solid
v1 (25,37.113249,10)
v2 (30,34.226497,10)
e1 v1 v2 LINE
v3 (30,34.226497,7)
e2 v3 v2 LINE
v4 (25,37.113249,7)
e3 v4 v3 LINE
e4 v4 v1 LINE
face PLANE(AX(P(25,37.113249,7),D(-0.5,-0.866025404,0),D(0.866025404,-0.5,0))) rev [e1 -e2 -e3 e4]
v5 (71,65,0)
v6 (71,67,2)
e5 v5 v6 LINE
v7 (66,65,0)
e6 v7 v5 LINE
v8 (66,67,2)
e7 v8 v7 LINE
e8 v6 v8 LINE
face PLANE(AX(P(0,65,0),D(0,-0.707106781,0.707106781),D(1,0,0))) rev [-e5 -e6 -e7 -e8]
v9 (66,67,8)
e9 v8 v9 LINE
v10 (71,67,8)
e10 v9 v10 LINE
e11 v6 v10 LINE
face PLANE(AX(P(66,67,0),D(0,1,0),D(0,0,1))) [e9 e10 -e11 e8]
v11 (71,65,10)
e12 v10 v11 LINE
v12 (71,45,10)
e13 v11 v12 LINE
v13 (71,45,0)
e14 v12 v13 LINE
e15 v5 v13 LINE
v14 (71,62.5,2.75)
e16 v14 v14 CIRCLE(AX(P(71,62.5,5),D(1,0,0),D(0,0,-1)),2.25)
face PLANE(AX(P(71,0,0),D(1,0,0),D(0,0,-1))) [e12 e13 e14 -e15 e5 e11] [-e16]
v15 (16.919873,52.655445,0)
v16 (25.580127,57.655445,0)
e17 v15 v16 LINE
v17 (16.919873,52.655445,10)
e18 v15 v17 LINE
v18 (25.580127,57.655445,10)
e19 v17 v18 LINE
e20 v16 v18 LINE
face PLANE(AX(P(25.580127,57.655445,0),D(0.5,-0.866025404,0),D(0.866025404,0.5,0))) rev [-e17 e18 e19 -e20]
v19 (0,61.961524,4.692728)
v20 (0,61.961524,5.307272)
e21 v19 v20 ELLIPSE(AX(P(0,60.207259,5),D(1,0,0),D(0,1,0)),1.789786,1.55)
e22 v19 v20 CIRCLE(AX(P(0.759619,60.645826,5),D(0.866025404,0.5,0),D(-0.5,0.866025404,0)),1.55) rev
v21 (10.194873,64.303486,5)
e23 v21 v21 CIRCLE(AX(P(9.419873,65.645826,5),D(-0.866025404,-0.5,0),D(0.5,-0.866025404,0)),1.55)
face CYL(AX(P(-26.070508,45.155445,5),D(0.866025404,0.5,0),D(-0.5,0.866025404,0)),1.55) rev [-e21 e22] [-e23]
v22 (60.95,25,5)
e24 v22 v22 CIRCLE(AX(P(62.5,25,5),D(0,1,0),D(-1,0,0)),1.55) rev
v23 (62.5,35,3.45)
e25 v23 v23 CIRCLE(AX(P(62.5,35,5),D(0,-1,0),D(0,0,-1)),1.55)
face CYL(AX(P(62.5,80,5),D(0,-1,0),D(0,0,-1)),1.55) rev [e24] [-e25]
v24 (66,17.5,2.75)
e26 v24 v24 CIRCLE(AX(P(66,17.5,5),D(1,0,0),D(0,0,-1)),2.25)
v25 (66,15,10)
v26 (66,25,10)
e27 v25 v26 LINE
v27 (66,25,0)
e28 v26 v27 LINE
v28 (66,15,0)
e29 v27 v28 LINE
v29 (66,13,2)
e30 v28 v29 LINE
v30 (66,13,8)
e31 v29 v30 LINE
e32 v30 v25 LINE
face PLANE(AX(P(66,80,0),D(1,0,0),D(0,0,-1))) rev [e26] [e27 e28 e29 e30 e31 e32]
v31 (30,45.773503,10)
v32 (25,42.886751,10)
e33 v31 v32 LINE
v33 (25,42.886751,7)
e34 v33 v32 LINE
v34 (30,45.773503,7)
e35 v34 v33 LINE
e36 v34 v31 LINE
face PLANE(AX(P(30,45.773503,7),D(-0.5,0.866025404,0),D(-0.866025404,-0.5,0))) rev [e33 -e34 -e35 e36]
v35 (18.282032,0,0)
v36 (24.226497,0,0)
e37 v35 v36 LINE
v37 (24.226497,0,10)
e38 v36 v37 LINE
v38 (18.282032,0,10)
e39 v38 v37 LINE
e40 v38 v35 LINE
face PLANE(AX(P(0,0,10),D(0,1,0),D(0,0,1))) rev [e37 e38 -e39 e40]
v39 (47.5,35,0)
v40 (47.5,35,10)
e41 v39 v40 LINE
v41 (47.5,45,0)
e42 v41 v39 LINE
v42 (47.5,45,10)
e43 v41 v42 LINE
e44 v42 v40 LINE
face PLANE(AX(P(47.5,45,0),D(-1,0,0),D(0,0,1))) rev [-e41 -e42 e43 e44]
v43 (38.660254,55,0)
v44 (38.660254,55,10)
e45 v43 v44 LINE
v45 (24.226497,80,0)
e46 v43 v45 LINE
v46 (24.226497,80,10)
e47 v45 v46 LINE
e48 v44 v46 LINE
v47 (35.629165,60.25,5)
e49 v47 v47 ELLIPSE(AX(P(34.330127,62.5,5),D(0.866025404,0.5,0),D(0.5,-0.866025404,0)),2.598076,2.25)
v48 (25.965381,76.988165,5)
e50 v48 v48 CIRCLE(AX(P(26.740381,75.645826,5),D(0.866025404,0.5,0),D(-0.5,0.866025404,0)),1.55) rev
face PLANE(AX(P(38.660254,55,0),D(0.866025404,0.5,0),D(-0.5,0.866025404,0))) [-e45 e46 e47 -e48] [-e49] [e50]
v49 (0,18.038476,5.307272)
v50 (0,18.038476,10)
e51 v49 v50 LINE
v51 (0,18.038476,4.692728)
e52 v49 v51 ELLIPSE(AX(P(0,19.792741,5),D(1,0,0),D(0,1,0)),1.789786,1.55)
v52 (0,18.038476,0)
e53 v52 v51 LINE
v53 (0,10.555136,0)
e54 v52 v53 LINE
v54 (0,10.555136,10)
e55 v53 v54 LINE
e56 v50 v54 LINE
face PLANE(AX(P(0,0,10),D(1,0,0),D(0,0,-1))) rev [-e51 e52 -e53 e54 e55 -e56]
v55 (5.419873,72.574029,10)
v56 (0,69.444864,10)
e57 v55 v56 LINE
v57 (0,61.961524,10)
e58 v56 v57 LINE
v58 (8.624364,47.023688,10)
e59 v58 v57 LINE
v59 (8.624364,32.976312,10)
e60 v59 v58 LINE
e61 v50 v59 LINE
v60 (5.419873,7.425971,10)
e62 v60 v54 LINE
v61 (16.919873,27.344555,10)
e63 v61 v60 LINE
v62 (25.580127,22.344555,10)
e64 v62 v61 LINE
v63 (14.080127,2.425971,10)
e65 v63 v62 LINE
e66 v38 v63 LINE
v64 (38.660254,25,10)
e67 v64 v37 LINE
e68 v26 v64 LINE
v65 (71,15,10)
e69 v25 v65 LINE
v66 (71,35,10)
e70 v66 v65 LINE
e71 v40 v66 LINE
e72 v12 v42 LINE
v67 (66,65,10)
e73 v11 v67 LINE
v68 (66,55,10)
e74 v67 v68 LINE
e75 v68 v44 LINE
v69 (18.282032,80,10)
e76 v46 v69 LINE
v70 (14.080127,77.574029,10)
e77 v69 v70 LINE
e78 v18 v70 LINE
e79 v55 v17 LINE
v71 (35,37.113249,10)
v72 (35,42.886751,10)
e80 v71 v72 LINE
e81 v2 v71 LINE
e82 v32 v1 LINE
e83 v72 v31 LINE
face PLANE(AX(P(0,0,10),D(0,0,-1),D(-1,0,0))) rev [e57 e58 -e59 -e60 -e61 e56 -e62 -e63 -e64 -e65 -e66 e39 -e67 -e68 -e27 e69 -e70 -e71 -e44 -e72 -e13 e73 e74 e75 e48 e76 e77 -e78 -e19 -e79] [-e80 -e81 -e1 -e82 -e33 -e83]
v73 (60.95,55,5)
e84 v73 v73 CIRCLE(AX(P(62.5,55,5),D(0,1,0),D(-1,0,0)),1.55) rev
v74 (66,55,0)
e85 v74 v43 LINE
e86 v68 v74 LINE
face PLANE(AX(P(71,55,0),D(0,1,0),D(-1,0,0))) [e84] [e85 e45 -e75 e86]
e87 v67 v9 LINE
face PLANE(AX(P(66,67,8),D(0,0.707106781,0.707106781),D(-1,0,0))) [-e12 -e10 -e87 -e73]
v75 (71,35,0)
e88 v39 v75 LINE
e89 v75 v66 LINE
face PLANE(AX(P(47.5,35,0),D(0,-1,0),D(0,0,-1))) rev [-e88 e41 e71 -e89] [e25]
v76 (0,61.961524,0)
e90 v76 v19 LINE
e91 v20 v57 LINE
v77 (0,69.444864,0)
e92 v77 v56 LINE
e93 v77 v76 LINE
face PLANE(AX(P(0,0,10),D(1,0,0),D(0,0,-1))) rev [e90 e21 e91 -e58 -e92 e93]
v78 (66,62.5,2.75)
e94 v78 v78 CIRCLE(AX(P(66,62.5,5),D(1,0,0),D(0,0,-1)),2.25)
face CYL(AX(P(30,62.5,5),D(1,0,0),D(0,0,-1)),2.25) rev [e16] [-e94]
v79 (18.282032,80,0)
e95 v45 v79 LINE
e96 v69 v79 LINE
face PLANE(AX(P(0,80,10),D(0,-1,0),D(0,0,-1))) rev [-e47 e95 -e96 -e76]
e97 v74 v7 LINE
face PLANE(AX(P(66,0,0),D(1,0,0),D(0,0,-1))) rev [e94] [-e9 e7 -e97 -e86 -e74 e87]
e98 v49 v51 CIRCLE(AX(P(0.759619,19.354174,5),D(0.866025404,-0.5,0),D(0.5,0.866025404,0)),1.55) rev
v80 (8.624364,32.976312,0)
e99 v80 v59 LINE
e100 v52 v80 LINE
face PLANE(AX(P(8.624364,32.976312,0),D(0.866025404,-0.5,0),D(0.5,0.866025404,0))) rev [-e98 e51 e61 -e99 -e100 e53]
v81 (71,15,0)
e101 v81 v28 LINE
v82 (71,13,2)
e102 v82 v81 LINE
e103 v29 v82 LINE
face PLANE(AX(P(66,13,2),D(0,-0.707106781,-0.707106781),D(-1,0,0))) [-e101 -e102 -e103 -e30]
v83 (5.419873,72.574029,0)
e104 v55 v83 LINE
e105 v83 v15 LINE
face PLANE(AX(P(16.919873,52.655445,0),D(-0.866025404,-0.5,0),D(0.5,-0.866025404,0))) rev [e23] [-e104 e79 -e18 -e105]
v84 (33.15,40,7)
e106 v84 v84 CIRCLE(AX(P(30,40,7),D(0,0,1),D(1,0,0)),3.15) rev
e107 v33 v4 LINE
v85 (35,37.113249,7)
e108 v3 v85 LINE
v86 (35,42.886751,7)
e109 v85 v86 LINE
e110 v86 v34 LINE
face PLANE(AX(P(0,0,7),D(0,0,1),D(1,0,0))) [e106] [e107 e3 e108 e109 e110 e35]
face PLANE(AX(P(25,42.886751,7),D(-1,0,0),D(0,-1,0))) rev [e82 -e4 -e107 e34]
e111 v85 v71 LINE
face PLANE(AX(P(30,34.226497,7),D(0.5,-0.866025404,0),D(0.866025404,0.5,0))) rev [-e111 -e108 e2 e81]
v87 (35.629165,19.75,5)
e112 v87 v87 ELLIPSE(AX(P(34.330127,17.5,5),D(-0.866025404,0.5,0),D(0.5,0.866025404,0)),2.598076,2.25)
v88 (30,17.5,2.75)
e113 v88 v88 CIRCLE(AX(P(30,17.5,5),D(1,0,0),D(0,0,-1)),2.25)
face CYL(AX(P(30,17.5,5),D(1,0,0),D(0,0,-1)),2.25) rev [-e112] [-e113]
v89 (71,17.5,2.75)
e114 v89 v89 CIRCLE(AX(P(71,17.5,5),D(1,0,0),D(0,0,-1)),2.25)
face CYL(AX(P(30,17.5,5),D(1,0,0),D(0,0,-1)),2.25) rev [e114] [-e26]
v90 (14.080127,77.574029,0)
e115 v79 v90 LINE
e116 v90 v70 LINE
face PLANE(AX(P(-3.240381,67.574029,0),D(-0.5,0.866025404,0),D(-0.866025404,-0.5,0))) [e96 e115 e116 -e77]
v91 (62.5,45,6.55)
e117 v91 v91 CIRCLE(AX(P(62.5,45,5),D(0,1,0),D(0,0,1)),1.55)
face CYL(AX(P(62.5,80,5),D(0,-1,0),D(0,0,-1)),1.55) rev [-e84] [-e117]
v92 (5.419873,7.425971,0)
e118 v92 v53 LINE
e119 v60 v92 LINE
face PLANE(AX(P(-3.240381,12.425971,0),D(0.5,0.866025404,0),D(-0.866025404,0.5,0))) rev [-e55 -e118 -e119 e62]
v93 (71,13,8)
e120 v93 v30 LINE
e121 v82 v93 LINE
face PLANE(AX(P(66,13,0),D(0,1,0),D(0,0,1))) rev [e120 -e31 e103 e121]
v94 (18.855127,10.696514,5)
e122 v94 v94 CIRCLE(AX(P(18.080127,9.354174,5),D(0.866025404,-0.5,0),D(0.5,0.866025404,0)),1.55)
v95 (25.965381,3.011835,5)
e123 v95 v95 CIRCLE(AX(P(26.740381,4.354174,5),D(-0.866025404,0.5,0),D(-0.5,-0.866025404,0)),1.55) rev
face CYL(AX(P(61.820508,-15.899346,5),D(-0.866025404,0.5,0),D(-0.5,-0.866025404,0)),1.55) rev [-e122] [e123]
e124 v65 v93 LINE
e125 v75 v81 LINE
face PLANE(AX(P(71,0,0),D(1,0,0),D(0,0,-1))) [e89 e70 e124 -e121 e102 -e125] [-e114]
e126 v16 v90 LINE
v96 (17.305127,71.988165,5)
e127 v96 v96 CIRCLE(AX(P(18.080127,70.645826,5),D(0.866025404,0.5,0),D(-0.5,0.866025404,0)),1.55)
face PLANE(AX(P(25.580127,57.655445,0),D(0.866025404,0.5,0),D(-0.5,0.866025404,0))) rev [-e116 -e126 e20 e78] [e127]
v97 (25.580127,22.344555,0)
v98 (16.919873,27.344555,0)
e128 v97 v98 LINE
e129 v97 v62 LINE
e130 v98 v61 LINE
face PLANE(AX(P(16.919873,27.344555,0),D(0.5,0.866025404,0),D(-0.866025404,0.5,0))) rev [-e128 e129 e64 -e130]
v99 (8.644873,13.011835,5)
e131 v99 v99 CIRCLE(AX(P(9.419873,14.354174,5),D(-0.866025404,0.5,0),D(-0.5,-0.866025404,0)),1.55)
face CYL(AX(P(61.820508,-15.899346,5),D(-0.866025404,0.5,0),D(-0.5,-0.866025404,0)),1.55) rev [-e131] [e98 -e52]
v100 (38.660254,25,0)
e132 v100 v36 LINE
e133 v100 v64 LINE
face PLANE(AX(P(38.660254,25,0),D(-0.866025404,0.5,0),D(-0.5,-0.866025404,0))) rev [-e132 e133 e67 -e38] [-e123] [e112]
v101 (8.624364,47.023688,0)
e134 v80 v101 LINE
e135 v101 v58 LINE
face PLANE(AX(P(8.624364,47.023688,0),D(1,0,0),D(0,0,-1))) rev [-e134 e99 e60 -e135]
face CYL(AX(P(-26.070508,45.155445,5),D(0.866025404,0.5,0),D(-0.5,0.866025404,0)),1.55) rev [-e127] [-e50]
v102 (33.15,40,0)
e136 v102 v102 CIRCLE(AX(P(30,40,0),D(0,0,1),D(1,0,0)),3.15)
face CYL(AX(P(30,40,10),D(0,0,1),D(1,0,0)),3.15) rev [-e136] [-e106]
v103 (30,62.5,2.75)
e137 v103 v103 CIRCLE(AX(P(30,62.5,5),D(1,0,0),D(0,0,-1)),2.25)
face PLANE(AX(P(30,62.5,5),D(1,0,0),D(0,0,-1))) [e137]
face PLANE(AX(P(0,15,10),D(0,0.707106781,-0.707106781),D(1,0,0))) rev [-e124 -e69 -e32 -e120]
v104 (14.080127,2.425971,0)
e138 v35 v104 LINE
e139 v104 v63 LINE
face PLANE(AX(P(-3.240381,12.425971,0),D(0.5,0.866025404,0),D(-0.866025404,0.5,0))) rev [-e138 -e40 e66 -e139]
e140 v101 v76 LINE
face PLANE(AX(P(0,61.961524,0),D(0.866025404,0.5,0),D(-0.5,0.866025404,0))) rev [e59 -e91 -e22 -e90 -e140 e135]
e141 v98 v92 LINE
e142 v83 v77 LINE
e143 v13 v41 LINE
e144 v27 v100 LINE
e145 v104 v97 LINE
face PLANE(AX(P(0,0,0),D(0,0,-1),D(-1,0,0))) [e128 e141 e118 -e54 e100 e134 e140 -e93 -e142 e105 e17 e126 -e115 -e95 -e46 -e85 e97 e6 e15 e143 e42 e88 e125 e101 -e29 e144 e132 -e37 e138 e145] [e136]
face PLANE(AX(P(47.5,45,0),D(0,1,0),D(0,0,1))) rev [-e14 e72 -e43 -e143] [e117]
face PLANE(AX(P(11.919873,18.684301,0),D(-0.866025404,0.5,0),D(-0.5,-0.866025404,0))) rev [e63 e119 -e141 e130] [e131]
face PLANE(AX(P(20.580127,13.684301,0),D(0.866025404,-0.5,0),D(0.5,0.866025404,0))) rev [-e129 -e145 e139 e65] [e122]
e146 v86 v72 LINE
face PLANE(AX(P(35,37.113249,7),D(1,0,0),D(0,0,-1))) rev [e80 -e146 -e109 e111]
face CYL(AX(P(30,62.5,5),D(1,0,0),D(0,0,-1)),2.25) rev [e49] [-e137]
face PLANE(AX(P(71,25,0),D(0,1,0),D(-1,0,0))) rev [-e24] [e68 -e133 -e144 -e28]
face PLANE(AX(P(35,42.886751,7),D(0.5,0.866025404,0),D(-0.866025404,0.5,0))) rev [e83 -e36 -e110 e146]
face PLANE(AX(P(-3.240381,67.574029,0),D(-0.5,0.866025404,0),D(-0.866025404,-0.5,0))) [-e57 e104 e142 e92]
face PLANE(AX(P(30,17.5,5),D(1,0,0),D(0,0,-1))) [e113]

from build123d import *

# Parameters (mm, degrees)
SKETCH1_W                = 71
SKETCH1_H                = 80
BOSS_EXTRUDE1_DEPTH      = 10
SKETCH3_W                = 10
SKETCH3_H                = 10
CUT_EXTRUDE1_DEPTH       = 10
SKETCH5_W                = 28.158683969
SKETCH5_H                = 10
CUT_EXTRUDE3_DEPTH       = 10
CIRPATTERN1_COUNT        = 3
M6_CLEARANCE_HOLE1_D     = 6.3
CUT_EXTRUDE6_DEPTH       = 3
SKETCH11_R               = 1.55
CUT_EXTRUDE7_DEPTH       = 108.429046352
CIRPATTERN2_COUNT        = 3
CUT_EXTRUDE8_DEPTH       = 10
CUT_EXTRUDE9_DEPTH       = 10
CUT_EXTRUDE10_DEPTH      = 10
SKETCH15_W               = 111
SKETCH15_H               = 42
BOSS_EXTRUDE2_DEPTH      = 10
SKETCH22_W               = 15
SKETCH22_H               = 54
BOSS_EXTRUDE3_DEPTH      = 10
M4_CLEARANCE_HOLE1_D     = 4.5
M4_CLEARANCE_HOLE1_DEPTH = 30
M4_CLEARANCE_HOLE1_TIP   = 1.351936393
SKETCH26_W               = 47.7
SKETCH26_H               = 6
CUT_EXTRUDE13_DEPTH      = 10
CHAMFER1_SIZE            = 4
CHAMFER1_SIZE_2          = 6.92820323
SKETCH27_W               = 6.3
SKETCH27_H               = 6
CUT_EXTRUDE14_DEPTH      = 10
CHAMFER2_SIZE            = 6.92820323
CHAMFER2_SIZE_2          = 4
CUT_EXTRUDE15_DEPTH      = 10
CUT_EXTRUDE16_DEPTH      = 2.2
CUT_EXTRUDE17_DEPTH      = 10
M4_CLEARANCE_HOLE2_D     = 4.5
SKETCH33_W               = 30
SKETCH33_H               = 90
CUT_EXTRUDE18_DEPTH      = 138.189649755
SKETCH34_W               = 10
SKETCH34_H               = 22
BOSS_EXTRUDE4_DEPTH      = 5
SKETCH38_R               = 2.25
CUT_EXTRUDE20_DEPTH      = 41
CHAMFER3_SIZE            = 2


with BuildPart() as part:
    # Sketch1 → Boss-Extrude1 (new body)
    with BuildSketch(Plane.XY):
        with Locations((35.5, 40)):
            Rectangle(SKETCH1_W, SKETCH1_H)
    extrude(amount=BOSS_EXTRUDE1_DEPTH)

    # Sketch3 → Cut-Extrude1 (cut)
    with BuildSketch(Plane.XY.offset(10)):
        Polygon((25.580127019, 57.655444566), (16.919872981, 52.655444566), (11.919872981, 61.315698604), (20.580127019, 66.315698604), align=None)
        Polygon((11.919872981, 18.684301396), (20.580127019, 13.684301396), (25.580127019, 22.344555434), (16.919872981, 27.344555434), align=None)
        with Locations((52.5, 40)):
            Rectangle(SKETCH3_W, SKETCH3_H)
    extrude(amount=-CUT_EXTRUDE1_DEPTH, mode=Mode.SUBTRACT)

    # Sketch5 → Cut-Extrude3 (cut)
    with BuildSketch(Plane.XY.offset(10)):
        with Locations((71.579341985, 40)):
            Rectangle(SKETCH5_W, SKETCH5_H)
    cut_extrude3 = extrude(amount=-CUT_EXTRUDE3_DEPTH, mode=Mode.SUBTRACT)

    # CirPattern1: Cut-Extrude3 ×3 about axis
    cirpattern1_axis = Axis((30, 40, 10), (0, 0, -1))
    for i in range(1, CIRPATTERN1_COUNT):
        add(cut_extrude3.rotate(cirpattern1_axis, i * 360 / CIRPATTERN1_COUNT), mode=Mode.SUBTRACT)

    # M6 Clearance Hole1 (through all)
    with Locations(Plane.XY.offset(10)):
        with Locations((30, 40)):
            Hole(M6_CLEARANCE_HOLE1_D / 2)

    # Sketch10 → Cut-Extrude6 (cut)
    with BuildSketch(Plane.XY.offset(10)):
        Polygon((30, 45.773502692), (25, 42.886751346), (25, 37.113248654), (30, 34.226497308), (35, 37.113248654), (35, 42.886751346), align=None)
    extrude(amount=-CUT_EXTRUDE6_DEPTH, mode=Mode.SUBTRACT)

    # Sketch11 → Cut-Extrude7 (cut, through all)
    with BuildSketch(Plane.XZ):
        with Locations(Location((62.5, 5, 0), (0, 0, 270))):
            Circle(SKETCH11_R)
    cut_extrude7 = extrude(amount=-CUT_EXTRUDE7_DEPTH, mode=Mode.SUBTRACT)

    # CirPattern2: Cut-Extrude7 ×3 about axis
    cirpattern2_axis = Axis((30, 40, 7), (0, 0, 1))
    for i in range(1, CIRPATTERN2_COUNT):
        add(cut_extrude7.rotate(cirpattern2_axis, i * 360 / CIRPATTERN2_COUNT), mode=Mode.SUBTRACT)

    # Sketch12 → Cut-Extrude8 (cut)
    with BuildSketch(Plane.XY.offset(10)):
        Polygon((71, 0), (71, 25), (38.660254038, 25), (24.226497308, 0), align=None)
    cut_extrude8 = extrude(amount=-CUT_EXTRUDE8_DEPTH, mode=Mode.SUBTRACT)

    # Mirror1: Cut-Extrude8 across plane
    add(cut_extrude8.mirror(Plane(origin=(0, 40, 0), x_dir=(0, 0, 1), z_dir=(0, -1, 0))), mode=Mode.SUBTRACT)

    # Sketch13 → Cut-Extrude9 (cut)
    with BuildSketch(Plane.XY.offset(10)):
        Polygon((0, 61.961524227), (8.624364028, 47.023687548), (8.624364028, 32.976312452), (0, 18.038475773), align=None)
    extrude(amount=-CUT_EXTRUDE9_DEPTH, mode=Mode.SUBTRACT)

    # Sketch14 → Cut-Extrude10 (cut)
    with BuildSketch(Plane.XY.offset(10)):
        Polygon((-3.240381057, 12.425971147), (22.740381057, -2.574028853), (18.169872981, -10.490381057), (-7.810889132, 4.509618943), align=None)
    cut_extrude10 = extrude(amount=-CUT_EXTRUDE10_DEPTH, mode=Mode.SUBTRACT)

    # Mirror2: Cut-Extrude10 across plane
    add(cut_extrude10.mirror(Plane(origin=(0, 40, 0), x_dir=(0, 0, 1), z_dir=(0, -1, 0))), mode=Mode.SUBTRACT)

    # Sketch15 → Boss-Extrude2 (add)
    with BuildSketch(Plane.XY.offset(10)):
        with Locations((126.5, 40)):
            Rectangle(SKETCH15_W, SKETCH15_H)
    extrude(amount=-BOSS_EXTRUDE2_DEPTH)

    # Sketch22 → Boss-Extrude3 (add)
    with BuildSketch(Plane.XY.offset(10)):
        with Locations((174.5, 40)):
            Rectangle(SKETCH22_W, SKETCH22_H)
    extrude(amount=-BOSS_EXTRUDE3_DEPTH)

    # M4 Clearance Hole1
    with Locations(Plane(origin=(182, 0, 0), x_dir=(0, 0, -1), z_dir=(1, 0, 0))):
        with Locations((-5, 62.5), (-5, 17.5)):
            Hole(M4_CLEARANCE_HOLE1_D / 2, depth=M4_CLEARANCE_HOLE1_DEPTH)
            with Locations((0, 0, -(M4_CLEARANCE_HOLE1_DEPTH + M4_CLEARANCE_HOLE1_TIP / 2))):  # 118° drill point
                Cone(0, M4_CLEARANCE_HOLE1_D / 2, M4_CLEARANCE_HOLE1_TIP, mode=Mode.SUBTRACT)

    # Sketch26 → Cut-Extrude13 (cut)
    with BuildSketch(Plane.XY.offset(10)):
        with Locations((143.15, 58)):
            Rectangle(SKETCH26_W, SKETCH26_H)
    cut_extrude13 = extrude(amount=-CUT_EXTRUDE13_DEPTH, mode=Mode.SUBTRACT)

    # Mirror3: Cut-Extrude13 across plane
    add(cut_extrude13.mirror(Plane(origin=(0, 40, 0), x_dir=(0, 0, 1), z_dir=(0, -1, 0))), mode=Mode.SUBTRACT)

    # Chamfer1
    # the kernel refuses this chamfer: 6.92820323, 4 mm, written as the material it adds along each edge
    with BuildSketch(Plane(origin=(119.3, 25, 10), x_dir=(0.9983227437537926, 0.05789386240267157, 0), z_dir=(0, 0, -1))) as chamfer1_piece_1_section:
        Polygon((CHAMFER1_SIZE * 0.998322743754, CHAMFER1_SIZE * 0.0578938624027), (-CHAMFER1_SIZE_2 * 0.057893862405, CHAMFER1_SIZE_2 * 0.998322743793), (0, 0), align=None)
    chamfer1_piece_1 = extrude(amount=10, mode=Mode.PRIVATE)
    chamfer1_piece_1 = split(chamfer1_piece_1, bisect_by=Plane(origin=(120.625811149, 19, 5), z_dir=(0, 1, 0)), keep=Keep.TOP, mode=Mode.PRIVATE)
    add(chamfer1_piece_1)
    with BuildSketch(Plane(origin=(119.3, 55, 10), x_dir=(-0.019326765612697788, 0.999813220622208, 0), z_dir=(0, 0, -1))) as chamfer1_piece_2_section:
        Polygon((CHAMFER1_SIZE_2 * 0.999813220662, CHAMFER1_SIZE_2 * 0.0193267656135), (-CHAMFER1_SIZE * 0.0193267656127, CHAMFER1_SIZE * 0.999813220622), (0, 0), align=None)
    chamfer1_piece_2 = extrude(amount=10, mode=Mode.PRIVATE)
    chamfer1_piece_2 = split(chamfer1_piece_2, bisect_by=Plane(origin=(120.625811149, 61, 5), z_dir=(0, -1, 0)), keep=Keep.TOP, mode=Mode.PRIVATE)
    add(chamfer1_piece_2)

    # Sketch27 → Cut-Extrude14 (cut)
    with BuildSketch(Plane.XY.offset(10)):
        with Locations((74.15, 58)):
            Rectangle(SKETCH27_W, SKETCH27_H)
    cut_extrude14 = extrude(amount=-CUT_EXTRUDE14_DEPTH, mode=Mode.SUBTRACT)

    # Mirror4: Cut-Extrude14 across plane
    add(cut_extrude14.mirror(Plane(origin=(0, 40, 0), x_dir=(0, 0, 1), z_dir=(0, -1, 0))), mode=Mode.SUBTRACT)

    # Chamfer2
    # the kernel refuses this chamfer: 6.92820323, 4 mm, written as the material it adds along each edge
    with BuildSketch(Plane(origin=(77.3, 55, 10), x_dir=(0.019326765612699692, 0.9998132206222079, 0), z_dir=(0, 0, -1))) as chamfer2_piece_1_section:
        Polygon((CHAMFER2_SIZE * 0.999813220662, -CHAMFER2_SIZE * 0.0193267656135), (-CHAMFER2_SIZE_2 * 0.0193267656127, -CHAMFER2_SIZE_2 * 0.999813220622), (0, 0), align=None)
    chamfer2_piece_1 = extrude(amount=10, mode=Mode.PRIVATE)
    chamfer2_piece_1 = split(chamfer2_piece_1, bisect_by=Plane(origin=(75.974188851, 61, 5), z_dir=(0, -1, 0)), keep=Keep.TOP, mode=Mode.PRIVATE)
    add(chamfer2_piece_1)
    with BuildSketch(Plane(origin=(77.3, 25, 10), x_dir=(-0.9983227437537929, 0.05789386240266474, 0), z_dir=(0, 0, -1))) as chamfer2_piece_2_section:
        Polygon((CHAMFER2_SIZE_2 * 0.998322743754, -CHAMFER2_SIZE_2 * 0.0578938624027), (-CHAMFER2_SIZE * 0.057893862405, -CHAMFER2_SIZE * 0.998322743793), (0, 0), align=None)
    chamfer2_piece_2 = extrude(amount=10, mode=Mode.PRIVATE)
    chamfer2_piece_2 = split(chamfer2_piece_2, bisect_by=Plane(origin=(75.974188851, 19, 5), z_dir=(0, 1, 0)), keep=Keep.TOP, mode=Mode.PRIVATE)
    add(chamfer2_piece_2)

    # Sketch21 → Cut-Extrude15 (cut)
    with BuildSketch(Plane.XY.offset(10)):
        with BuildLine():
            Line((97.55, 47.5), (99.05, 47.5))
            ThreePointArc((99.05, 47.5), (106.55, 40), (99.05, 32.5))
            Line((99.05, 32.5), (97.55, 32.5))
            ThreePointArc((97.55, 32.5), (90.05, 40), (97.55, 47.5))
        make_face()
    extrude(amount=-CUT_EXTRUDE15_DEPTH, mode=Mode.SUBTRACT)

    # Sketch28 → Cut-Extrude16 (cut)
    with BuildSketch(Plane.XY.offset(10)):
        with BuildLine():
            Line((97.55, 51.25), (99.05, 51.25))
            ThreePointArc((99.05, 51.25), (110.3, 40), (99.05, 28.75))
            Line((99.05, 28.75), (97.55, 28.75))
            ThreePointArc((97.55, 28.75), (86.3, 40), (97.55, 51.25))
        make_face()
    extrude(amount=-CUT_EXTRUDE16_DEPTH, mode=Mode.SUBTRACT)

    # Sketch29 → Cut-Extrude17 (cut)
    with BuildSketch(Plane.XY.offset(10)):
        with BuildLine():
            Line((82.05, 57.2), (83.55, 57.2))
            ThreePointArc((83.55, 57.2), (85.25, 55.5), (83.55, 53.8))
            Line((83.55, 53.8), (82.05, 53.8))
            ThreePointArc((82.05, 53.8), (80.35, 55.5), (82.05, 57.2))
        make_face()
        with BuildLine():
            Line((113.05, 53.8), (114.55, 53.8))
            ThreePointArc((114.55, 53.8), (116.25, 55.5), (114.55, 57.2))
            Line((114.55, 57.2), (113.05, 57.2))
            ThreePointArc((113.05, 57.2), (111.35, 55.5), (113.05, 53.8))
        make_face()
        with BuildLine():
            Line((113.05, 22.8), (114.55, 22.8))
            ThreePointArc((114.55, 22.8), (116.25, 24.5), (114.55, 26.2))
            Line((114.55, 26.2), (113.05, 26.2))
            ThreePointArc((113.05, 26.2), (111.35, 24.5), (113.05, 22.8))
        make_face()
        with BuildLine():
            Line((82.05, 22.8), (83.55, 22.8))
            ThreePointArc((83.55, 22.8), (85.25, 24.5), (83.55, 26.2))
            Line((83.55, 26.2), (82.05, 26.2))
            ThreePointArc((82.05, 26.2), (80.35, 24.5), (82.05, 22.8))
        make_face()
    extrude(amount=-CUT_EXTRUDE17_DEPTH, mode=Mode.SUBTRACT)

    # M4 Clearance Hole2 (through all)
    with Locations(Plane.XY.offset(10)):
        with Locations((134, 50.5), (155, 50.5), (155, 29.5), (134, 29.5)):
            Hole(M4_CLEARANCE_HOLE2_D / 2)

    # Sketch33 → Cut-Extrude18 (cut, through all)
    with BuildSketch(Plane.ZY.offset(-71)):
        with Locations((5, 40)):
            Rectangle(SKETCH33_W, SKETCH33_H)
    extrude(amount=-CUT_EXTRUDE18_DEPTH, mode=Mode.SUBTRACT)

    # Sketch34 → Boss-Extrude4 (add)
    with BuildSketch(Plane(origin=(71, 0, 0), x_dir=(0, 0, -1), z_dir=(1, 0, 0))):
        with Locations((-5, 56)):
            Rectangle(SKETCH34_W, SKETCH34_H)
    boss_extrude4 = extrude(amount=-BOSS_EXTRUDE4_DEPTH)

    # Mirror5: Boss-Extrude4 across plane
    add(boss_extrude4.mirror(Plane(origin=(0, 40, 0), x_dir=(0, 0, 1), z_dir=(0, -1, 0))))

    # Sketch38 → Cut-Extrude20 (cut)
    with BuildSketch(Plane(origin=(71, 0, 0), x_dir=(0, 0, -1), z_dir=(1, 0, 0))):
        with Locations((-5, 62.5)):
            Circle(SKETCH38_R)
        with Locations((-5, 17.5)):
            Circle(SKETCH38_R)
    extrude(amount=-CUT_EXTRUDE20_DEPTH, mode=Mode.SUBTRACT)

    # Chamfer3
    chamfer3_edges = [part.edges().sort_by_distance(p)[0] for p in [
        (68.5, 67, 10),
        (68.5, 67, 0),
        (68.5, 13, 10),
        (68.5, 13, 0),
    ]]
    chamfer(chamfer3_edges, length=CHAMFER3_SIZE)


solid = part.part
